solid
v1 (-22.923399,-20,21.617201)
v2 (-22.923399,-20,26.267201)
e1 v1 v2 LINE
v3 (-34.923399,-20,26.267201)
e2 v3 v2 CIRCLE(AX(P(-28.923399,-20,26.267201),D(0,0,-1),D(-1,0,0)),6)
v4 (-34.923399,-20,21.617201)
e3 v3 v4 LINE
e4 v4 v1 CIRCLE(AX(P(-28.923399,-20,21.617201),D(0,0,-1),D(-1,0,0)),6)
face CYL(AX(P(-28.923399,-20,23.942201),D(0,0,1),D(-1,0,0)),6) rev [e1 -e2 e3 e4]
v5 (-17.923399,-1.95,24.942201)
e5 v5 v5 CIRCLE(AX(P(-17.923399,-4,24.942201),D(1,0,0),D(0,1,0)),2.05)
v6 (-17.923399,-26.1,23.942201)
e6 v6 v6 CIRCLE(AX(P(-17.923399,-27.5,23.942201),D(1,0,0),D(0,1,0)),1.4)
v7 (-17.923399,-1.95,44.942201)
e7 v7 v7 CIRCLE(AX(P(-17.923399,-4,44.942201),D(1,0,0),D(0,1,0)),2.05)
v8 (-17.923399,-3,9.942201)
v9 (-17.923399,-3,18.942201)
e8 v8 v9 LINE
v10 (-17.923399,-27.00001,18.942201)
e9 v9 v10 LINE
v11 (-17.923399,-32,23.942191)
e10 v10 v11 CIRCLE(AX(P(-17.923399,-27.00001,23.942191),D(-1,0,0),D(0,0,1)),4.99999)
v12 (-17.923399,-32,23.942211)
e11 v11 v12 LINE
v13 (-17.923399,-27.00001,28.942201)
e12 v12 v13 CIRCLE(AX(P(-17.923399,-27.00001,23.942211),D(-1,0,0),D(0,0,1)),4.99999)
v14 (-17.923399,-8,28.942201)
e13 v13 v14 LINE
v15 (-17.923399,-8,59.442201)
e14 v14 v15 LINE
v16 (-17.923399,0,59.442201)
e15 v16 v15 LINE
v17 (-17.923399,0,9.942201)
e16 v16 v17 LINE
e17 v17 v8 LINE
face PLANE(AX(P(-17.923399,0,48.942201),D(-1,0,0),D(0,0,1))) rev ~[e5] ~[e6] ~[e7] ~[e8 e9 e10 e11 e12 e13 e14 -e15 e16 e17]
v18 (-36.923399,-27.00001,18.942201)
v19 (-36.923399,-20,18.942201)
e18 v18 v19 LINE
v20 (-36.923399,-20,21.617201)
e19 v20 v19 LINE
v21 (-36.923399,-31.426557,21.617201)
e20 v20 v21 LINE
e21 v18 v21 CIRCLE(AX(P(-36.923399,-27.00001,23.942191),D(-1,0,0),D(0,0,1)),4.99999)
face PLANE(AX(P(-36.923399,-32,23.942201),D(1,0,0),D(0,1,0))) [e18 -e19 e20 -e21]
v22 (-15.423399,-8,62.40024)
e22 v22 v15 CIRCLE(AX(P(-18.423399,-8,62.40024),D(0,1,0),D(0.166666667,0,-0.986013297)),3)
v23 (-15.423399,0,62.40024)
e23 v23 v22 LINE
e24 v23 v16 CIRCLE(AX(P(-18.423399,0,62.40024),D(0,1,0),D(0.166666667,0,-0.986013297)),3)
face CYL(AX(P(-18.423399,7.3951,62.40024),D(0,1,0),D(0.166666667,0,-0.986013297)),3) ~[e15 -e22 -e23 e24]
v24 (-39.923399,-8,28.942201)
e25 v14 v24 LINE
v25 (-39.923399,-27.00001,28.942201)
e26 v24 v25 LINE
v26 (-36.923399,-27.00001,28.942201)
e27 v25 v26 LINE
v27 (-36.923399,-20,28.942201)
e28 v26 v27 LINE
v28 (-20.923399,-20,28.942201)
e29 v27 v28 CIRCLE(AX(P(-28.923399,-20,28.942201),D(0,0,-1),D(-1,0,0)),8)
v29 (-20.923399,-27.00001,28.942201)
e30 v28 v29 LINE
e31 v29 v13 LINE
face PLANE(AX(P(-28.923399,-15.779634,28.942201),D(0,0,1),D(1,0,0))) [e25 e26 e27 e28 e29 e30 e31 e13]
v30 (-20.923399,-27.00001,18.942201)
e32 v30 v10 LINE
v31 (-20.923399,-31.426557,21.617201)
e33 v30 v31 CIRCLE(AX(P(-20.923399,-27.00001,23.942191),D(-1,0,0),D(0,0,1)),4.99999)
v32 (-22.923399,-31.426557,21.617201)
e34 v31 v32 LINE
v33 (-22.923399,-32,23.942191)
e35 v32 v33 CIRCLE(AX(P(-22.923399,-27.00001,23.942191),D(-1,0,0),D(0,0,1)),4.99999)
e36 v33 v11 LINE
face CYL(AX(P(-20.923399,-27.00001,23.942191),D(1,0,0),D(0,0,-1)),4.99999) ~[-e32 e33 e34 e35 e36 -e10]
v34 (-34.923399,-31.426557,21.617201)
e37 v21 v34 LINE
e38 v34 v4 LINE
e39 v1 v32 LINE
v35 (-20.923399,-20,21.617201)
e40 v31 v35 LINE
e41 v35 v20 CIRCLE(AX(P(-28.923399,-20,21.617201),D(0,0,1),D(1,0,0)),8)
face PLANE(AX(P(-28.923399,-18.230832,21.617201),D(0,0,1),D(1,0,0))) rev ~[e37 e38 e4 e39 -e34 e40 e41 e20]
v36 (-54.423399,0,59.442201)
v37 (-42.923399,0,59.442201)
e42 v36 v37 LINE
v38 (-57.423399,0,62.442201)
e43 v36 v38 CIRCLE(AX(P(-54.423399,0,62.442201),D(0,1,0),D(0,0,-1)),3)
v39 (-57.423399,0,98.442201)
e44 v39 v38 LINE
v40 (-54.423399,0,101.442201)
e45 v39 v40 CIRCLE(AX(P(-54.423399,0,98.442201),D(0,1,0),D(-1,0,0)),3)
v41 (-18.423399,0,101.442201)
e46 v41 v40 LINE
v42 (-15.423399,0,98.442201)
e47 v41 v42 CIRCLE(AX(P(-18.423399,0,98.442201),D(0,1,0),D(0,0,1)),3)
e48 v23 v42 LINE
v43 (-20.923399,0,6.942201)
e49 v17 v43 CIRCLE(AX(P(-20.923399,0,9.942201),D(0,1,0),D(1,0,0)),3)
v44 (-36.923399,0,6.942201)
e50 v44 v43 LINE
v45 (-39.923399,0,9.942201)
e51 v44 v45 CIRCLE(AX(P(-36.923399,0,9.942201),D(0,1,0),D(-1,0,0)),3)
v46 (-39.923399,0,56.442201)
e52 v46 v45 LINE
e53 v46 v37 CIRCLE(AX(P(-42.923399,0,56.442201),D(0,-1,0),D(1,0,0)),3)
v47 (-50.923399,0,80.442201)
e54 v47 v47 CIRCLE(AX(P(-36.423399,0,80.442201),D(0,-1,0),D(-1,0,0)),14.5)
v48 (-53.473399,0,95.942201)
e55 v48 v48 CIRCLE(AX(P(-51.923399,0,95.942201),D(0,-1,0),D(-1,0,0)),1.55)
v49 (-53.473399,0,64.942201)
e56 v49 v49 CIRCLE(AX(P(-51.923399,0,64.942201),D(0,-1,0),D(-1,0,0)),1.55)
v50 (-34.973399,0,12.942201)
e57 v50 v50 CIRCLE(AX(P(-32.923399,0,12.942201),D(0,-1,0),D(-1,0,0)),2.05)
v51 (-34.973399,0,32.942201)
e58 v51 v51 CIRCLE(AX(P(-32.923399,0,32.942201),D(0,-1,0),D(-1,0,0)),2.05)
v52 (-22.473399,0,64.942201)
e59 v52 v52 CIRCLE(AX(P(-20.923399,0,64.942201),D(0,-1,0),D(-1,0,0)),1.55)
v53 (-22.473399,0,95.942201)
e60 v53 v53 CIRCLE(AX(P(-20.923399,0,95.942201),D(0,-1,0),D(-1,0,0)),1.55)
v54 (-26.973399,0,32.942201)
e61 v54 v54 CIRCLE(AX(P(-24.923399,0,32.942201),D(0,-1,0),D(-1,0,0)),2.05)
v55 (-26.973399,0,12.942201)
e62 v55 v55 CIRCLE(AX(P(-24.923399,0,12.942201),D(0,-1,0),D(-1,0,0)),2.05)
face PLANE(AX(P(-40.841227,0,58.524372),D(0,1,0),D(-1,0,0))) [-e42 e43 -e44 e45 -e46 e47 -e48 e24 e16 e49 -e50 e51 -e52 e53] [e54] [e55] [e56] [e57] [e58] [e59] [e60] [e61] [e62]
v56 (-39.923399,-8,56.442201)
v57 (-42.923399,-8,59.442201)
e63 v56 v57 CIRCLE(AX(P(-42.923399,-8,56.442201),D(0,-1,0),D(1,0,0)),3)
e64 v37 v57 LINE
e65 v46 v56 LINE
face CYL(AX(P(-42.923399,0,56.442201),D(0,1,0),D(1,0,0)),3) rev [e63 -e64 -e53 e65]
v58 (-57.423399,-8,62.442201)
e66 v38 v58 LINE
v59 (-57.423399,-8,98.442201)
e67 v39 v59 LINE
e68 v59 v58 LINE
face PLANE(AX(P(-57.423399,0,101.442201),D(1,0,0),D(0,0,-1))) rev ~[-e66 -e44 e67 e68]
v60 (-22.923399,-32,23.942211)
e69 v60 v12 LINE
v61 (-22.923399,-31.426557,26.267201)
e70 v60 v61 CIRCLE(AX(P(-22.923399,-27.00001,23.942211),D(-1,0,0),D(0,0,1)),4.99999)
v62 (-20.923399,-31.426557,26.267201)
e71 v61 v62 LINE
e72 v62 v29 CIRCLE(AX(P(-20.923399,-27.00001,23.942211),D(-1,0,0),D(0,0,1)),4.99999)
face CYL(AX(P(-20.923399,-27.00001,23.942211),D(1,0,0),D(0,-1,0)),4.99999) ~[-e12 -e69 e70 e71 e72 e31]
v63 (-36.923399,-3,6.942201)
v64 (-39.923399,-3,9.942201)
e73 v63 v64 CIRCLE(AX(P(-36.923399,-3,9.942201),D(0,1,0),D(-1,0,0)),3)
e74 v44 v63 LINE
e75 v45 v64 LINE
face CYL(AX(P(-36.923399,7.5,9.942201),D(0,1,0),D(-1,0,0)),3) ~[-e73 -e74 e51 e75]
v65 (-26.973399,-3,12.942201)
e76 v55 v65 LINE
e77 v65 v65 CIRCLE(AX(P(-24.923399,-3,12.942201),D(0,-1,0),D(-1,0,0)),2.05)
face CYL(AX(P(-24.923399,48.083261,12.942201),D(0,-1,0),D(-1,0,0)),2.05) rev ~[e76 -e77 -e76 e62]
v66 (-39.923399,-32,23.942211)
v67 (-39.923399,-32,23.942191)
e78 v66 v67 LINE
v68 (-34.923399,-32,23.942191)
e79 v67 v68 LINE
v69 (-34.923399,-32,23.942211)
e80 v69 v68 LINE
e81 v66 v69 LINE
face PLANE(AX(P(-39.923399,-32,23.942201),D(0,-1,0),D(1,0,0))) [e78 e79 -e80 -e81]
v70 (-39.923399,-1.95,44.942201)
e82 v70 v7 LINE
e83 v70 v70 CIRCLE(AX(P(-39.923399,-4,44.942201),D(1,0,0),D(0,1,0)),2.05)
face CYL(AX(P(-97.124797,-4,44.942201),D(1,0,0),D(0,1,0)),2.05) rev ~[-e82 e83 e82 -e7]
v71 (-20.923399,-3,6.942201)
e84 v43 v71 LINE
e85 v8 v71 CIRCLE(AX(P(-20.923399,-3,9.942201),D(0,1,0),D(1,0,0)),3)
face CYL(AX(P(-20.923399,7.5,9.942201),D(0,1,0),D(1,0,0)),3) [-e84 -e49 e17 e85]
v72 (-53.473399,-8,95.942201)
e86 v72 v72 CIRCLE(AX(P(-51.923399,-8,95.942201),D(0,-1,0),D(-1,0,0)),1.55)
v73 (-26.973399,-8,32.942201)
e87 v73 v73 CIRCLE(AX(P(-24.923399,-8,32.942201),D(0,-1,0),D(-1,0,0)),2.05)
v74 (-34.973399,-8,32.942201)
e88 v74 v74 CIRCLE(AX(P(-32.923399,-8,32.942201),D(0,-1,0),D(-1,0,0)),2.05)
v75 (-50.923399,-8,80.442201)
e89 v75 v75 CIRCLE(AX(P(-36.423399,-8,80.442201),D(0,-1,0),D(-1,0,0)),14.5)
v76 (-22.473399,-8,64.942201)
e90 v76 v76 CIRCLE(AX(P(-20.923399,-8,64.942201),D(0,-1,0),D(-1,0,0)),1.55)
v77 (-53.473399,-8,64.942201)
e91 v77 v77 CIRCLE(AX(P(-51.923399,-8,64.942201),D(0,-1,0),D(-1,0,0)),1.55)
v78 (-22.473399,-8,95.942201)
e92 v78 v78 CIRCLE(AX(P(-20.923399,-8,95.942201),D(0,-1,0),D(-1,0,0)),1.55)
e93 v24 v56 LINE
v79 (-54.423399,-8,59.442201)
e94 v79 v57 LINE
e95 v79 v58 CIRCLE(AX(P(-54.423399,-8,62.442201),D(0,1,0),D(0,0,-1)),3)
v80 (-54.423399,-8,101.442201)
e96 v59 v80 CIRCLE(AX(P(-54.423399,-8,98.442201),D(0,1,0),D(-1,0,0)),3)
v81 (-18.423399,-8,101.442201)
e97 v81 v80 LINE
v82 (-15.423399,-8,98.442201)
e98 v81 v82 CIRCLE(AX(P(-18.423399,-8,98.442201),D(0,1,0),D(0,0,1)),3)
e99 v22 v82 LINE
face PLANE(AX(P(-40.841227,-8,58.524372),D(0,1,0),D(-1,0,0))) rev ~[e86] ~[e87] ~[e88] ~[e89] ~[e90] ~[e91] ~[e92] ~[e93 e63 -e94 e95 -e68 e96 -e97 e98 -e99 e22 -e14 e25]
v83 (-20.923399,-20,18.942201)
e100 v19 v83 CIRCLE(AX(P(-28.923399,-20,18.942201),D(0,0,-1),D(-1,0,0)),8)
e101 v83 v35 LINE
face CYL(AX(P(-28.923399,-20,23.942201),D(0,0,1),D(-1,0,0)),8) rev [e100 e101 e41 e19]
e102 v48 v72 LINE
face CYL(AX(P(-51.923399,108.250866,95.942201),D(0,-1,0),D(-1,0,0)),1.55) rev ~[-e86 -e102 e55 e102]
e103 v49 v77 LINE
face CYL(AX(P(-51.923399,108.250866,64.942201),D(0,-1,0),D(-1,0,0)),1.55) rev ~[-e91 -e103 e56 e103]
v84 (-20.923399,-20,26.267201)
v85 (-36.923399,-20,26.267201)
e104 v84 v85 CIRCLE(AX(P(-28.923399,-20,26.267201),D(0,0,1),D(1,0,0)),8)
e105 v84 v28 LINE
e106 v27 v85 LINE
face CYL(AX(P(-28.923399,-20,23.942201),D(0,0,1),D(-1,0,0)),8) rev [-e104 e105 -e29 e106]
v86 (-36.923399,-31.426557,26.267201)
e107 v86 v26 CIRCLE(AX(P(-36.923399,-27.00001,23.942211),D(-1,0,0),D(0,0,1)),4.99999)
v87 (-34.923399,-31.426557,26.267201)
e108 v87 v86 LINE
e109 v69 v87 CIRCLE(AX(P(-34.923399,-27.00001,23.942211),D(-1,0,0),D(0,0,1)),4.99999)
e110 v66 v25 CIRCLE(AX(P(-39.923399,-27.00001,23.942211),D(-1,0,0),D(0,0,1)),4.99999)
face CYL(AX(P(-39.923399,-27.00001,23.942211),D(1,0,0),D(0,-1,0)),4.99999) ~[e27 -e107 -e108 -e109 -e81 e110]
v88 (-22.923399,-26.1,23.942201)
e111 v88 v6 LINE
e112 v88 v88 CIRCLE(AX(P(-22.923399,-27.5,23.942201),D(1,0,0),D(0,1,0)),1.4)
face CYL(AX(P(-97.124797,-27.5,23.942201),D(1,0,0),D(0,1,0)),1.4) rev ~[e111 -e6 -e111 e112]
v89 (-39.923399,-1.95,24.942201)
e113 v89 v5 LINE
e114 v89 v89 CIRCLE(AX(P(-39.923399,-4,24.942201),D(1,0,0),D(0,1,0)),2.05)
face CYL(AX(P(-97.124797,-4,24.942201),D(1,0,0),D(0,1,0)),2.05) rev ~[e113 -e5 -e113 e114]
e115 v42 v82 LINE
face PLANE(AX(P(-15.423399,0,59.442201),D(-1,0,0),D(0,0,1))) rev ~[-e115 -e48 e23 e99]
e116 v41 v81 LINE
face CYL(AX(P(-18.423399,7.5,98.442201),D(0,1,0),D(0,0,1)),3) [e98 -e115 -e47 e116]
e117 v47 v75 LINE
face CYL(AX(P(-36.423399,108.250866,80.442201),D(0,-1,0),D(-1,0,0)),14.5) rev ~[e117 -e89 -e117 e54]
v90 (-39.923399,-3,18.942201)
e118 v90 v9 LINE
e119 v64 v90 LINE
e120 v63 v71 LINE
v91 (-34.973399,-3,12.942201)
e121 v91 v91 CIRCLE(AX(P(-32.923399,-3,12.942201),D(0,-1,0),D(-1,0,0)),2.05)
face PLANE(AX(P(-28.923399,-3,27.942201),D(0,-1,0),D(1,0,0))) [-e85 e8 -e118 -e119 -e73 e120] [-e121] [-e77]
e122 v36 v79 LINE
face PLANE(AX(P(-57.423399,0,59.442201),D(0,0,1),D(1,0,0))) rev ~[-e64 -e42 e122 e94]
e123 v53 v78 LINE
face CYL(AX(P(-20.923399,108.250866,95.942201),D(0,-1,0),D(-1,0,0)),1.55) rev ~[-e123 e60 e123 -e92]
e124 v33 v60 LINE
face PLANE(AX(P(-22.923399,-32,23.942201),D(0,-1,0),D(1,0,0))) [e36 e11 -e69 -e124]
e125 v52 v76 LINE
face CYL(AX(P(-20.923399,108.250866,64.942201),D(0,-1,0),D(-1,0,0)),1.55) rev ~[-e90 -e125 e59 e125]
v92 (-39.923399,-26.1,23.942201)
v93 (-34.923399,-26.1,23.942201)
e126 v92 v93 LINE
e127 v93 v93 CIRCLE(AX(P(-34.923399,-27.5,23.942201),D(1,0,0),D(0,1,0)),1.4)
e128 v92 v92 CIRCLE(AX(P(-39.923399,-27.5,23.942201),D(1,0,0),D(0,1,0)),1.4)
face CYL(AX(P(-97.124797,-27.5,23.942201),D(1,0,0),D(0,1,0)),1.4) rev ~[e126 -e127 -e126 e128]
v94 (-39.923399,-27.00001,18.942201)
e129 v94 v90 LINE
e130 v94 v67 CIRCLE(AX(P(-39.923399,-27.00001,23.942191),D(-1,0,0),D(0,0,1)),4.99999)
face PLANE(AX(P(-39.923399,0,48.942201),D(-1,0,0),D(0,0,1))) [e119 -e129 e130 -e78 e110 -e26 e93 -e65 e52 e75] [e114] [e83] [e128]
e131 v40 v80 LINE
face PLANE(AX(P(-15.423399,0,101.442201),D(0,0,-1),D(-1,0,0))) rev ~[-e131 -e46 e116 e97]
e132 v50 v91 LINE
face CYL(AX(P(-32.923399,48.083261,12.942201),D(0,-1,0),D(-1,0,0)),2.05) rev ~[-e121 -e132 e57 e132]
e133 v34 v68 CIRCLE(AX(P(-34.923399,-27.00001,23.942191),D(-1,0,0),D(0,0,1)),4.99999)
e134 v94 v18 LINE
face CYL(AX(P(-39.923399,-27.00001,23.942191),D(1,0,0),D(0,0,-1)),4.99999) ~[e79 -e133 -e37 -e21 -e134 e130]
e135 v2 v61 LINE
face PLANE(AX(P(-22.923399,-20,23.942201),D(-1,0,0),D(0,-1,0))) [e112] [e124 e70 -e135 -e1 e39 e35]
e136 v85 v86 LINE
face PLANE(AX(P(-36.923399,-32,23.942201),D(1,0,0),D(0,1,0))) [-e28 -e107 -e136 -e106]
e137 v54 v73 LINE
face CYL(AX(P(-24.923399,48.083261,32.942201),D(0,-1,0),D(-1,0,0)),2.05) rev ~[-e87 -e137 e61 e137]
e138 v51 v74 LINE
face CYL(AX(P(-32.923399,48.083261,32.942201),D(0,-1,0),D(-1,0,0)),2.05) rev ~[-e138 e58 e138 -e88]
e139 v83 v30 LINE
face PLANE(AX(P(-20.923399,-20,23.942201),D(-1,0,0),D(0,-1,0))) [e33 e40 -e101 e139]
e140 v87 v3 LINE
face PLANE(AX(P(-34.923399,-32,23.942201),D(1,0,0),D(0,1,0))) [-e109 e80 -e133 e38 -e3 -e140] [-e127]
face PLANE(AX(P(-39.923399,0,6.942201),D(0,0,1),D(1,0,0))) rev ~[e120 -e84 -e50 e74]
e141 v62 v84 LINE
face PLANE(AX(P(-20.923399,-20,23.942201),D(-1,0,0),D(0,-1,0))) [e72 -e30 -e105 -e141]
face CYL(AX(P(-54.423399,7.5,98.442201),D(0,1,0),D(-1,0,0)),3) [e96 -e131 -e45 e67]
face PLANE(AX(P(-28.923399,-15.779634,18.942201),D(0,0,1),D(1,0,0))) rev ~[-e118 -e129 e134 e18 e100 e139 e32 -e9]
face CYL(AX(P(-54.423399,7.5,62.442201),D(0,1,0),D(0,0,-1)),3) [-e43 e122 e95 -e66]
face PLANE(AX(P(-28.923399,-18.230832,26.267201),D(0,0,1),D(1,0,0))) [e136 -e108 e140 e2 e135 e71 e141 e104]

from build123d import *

# Parameters (mm, degrees)
F0_W          = 22
F0_H          = 42
F1_DEPTH      = 3
F2_W          = 3
F2_H          = 30
F2_W_2        = 5
F3_DEPTH      = 22
F4_D          = 4.1
F7_DEPTH      = 5
F8_DEPTH      = 2.325
F9_R          = 4.99999
F11_D         = 4.1
F12_D         = 2.8
F13_W         = 22
F13_H         = 10.5
F14_DEPTH     = 8
F15_T1_DEPTH  = 8
F15_T3_DEPTH  = 18
F15_T5_DEPTH  = 18
F15_T7_DEPTH  = 22.7901994578
F15_T9_DEPTH  = 23
F15_T11_DEPTH = 23
F15_T13_DEPTH = 23
F16_D         = 29
F17_D         = 3.1


# Not quite as in the source:
# - a fillet or chamfer that OpenCascade refuses, or shapes differently, is made with other operations: its cross-section is extruded or revolved along the edge and cut away or added
# - a fillet or chamfer is up to 0.001 mm smaller than in the source, because OpenCascade refuses the exact size


with BuildPart() as f1:
    # F0 (on Front) → F1 (new body)
    with BuildSketch(Plane.XZ):
        with Locations((-28.9233987555, 27.9422005266)):
            Rectangle(F0_W, F0_H)
    extrude(amount=F1_DEPTH)

    # F2 (on face) → F3 (join)
    with BuildSketch(Plane(origin=(-39.9233987555, 0, 0), x_dir=(0, -1, 0), z_dir=(-1, 0, 0))):
        with Locations((1.5, 33.9422005266)):
            Rectangle(F2_W, F2_H)
        with Locations((5.5, 33.9422005266)):
            Rectangle(F2_W_2, F2_H)
    extrude(amount=-F3_DEPTH)

    # F4 (through all)
    with Locations(Plane(origin=(0, 0, 0), x_dir=(1, 0, 0), z_dir=(0, 1, 0))):
        with Locations((-24.9233987555, -12.9422005266), (-32.9233987555, -12.9422005266), (-32.9233987555, -32.9422005266), (-24.9233987555, -32.9422005266)):
            Hole(F4_D / 2)

    # F6 (on line) → F7 (join, symmetric)
    with BuildSketch(Plane.XY.offset(23.9422005266)):
        with BuildLine():
            ThreePointArc((-36.9233987555, -20), (-28.9233987555, -12), (-20.9233987555, -20))
            Line((-20.9233987555, -20), (-20.9233987555, -32))
            Line((-20.9233987555, -32), (-17.9233987555, -32))
            Line((-17.9233987555, -32), (-17.9233987555, 0))
            Line((-17.9233987555, 0), (-39.9233987555, 0))
            Line((-39.9233987555, 0), (-39.9233987555, -32))
            Line((-39.9233987555, -32), (-36.9233987555, -32))
            Line((-36.9233987555, -32), (-36.9233987555, -20))
        make_face()
    extrude(amount=F7_DEPTH, both=True)

    # F6 (on line) → F8 (join, symmetric)
    with BuildSketch(Plane.XY.offset(23.9422005266)):
        with BuildLine():
            ThreePointArc((-34.9233987555, -20), (-28.9233987555, -14), (-22.9233987555, -20))
            Line((-22.9233987555, -20), (-22.9233987555, -25.2915026221))
            ThreePointArc((-22.9233987555, -25.2915026221), (-21.4400839819, -22.8284271247), (-20.9233987555, -20))
            ThreePointArc((-20.9233987555, -20), (-28.9233987555, -12), (-36.9233987555, -20))
            ThreePointArc((-36.9233987555, -20), (-36.406713529, -22.8284271247), (-34.9233987555, -25.2915026221))
            Line((-34.9233987555, -25.2915026221), (-34.9233987555, -20))
        make_face()
        with BuildLine():
            Line((-34.9233987555, -32), (-34.9233987555, -25.2915026221))
            ThreePointArc((-34.9233987555, -25.2915026221), (-36.406713529, -22.8284271247), (-36.9233987555, -20))
            Line((-36.9233987555, -20), (-36.9233987555, -32))
            Line((-36.9233987555, -32), (-34.9233987555, -32))
        make_face()
        with BuildLine():
            ThreePointArc((-20.9233987555, -20), (-21.4400839819, -22.8284271247), (-22.9233987555, -25.2915026221))
            Line((-22.9233987555, -25.2915026221), (-22.9233987555, -32))
            Line((-22.9233987555, -32), (-20.9233987555, -32))
            Line((-20.9233987555, -32), (-20.9233987555, -20))
        make_face()
    extrude(amount=F8_DEPTH, both=True)

    # F9 (radius 5 in the source; OpenCascade refuses exactly that, so slightly less here)
    f9_edges = [f1.edges().sort_by_distance(p)[0] for p in [
        (-38.423399, -32, 28.942201),
        (-38.423399, -32, 18.942201),
        (-19.423399, -32, 18.942201),
        (-19.423399, -32, 28.942201),
    ]]
    fillet(f9_edges, radius=F9_R)

    # F11 (through all)
    with Locations(Plane(origin=(-39.9233987555, 0, 0), x_dir=(0, -1, 0), z_dir=(-1, 0, 0))):
        with Locations((4, 44.9422005266), (4, 24.9422005266)):
            Hole(F11_D / 2)

    # F12 (through all)
    with Locations(Plane(origin=(-39.9233987555, 0, 0), x_dir=(0, -1, 0), z_dir=(-1, 0, 0))):
        with Locations((27.5, 23.9422005266)):
            Hole(F12_D / 2)

    # F13 (on Front) → F14 (join)
    with BuildSketch(Plane.XZ):
        Polygon((-57.4233987555, 59.4422005266), (-39.9233987555, 59.4422005266), (-17.9233987555, 59.4422005266), (-15.4233987555, 59.4422005266), (-15.4233987555, 101.4422005266), (-57.4233987555, 101.4422005266), align=None)
        with Locations((-28.9233987555, 54.1922005266)):
            Rectangle(F13_W, F13_H)
    extrude(amount=F14_DEPTH)

    # F15: fillet of radius 3 on 7 edges, made by hand

    # F15_s2 → F15_t1 (join)
    with BuildSketch(Plane.XZ):
        with BuildLine():
            ThreePointArc((-39.9233987555, 56.4422005266), (-40.8020784119, 58.5635208702), (-42.9233987555, 59.4422005266))
            Line((-42.9233987555, 59.4422005266), (-39.9233987555, 59.4422005266))
            Line((-39.9233987555, 59.4422005266), (-39.9233987555, 56.4422005266))
        make_face()
    extrude(amount=F15_T1_DEPTH)

    # F15_s4 → F15_t3 (cut)
    with BuildSketch(Plane.XZ.offset(-7.5)):
        with BuildLine():
            ThreePointArc((-39.9233987555, 9.9422005266), (-39.0447190991, 7.820880183), (-36.9233987555, 6.9422005266))
            Line((-36.9233987555, 6.9422005266), (-39.9233987555, 6.9422005266))
            Line((-39.9233987555, 6.9422005266), (-39.9233987555, 9.9422005266))
        make_face()
    extrude(amount=F15_T3_DEPTH, mode=Mode.SUBTRACT)

    # F15_s6 → F15_t5 (cut)
    with BuildSketch(Plane.XZ.offset(-7.5)):
        with BuildLine():
            ThreePointArc((-17.9233987555, 9.9422005266), (-18.8020784119, 7.820880183), (-20.9233987555, 6.9422005266))
            Line((-20.9233987555, 6.9422005266), (-17.9233987555, 6.9422005266))
            Line((-17.9233987555, 6.9422005266), (-17.9233987555, 9.9422005266))
        make_face()
    extrude(amount=F15_T5_DEPTH, mode=Mode.SUBTRACT)

    # F15_s8 → F15_t7 (cut)
    with BuildSketch(Plane.XZ.offset(-7.3950997289)):
        with BuildLine():
            ThreePointArc((-17.9233987555, 59.4422005266), (-16.132110908, 60.463748745), (-15.4233987555, 62.4002404181))
            Line((-15.4233987555, 62.4002404181), (-15.4233987555, 59.4422005266))
            Line((-15.4233987555, 59.4422005266), (-17.9233987555, 59.4422005266))
        make_face()
    extrude(amount=F15_T7_DEPTH, mode=Mode.SUBTRACT)

    # F15_s10 → F15_t9 (cut)
    with BuildSketch(Plane.XZ.offset(-7.5)):
        with BuildLine():
            ThreePointArc((-18.4233987555, 101.4422005266), (-16.3020784119, 100.5635208702), (-15.4233987555, 98.4422005266))
            Line((-15.4233987555, 98.4422005266), (-15.4233987555, 101.4422005266))
            Line((-15.4233987555, 101.4422005266), (-18.4233987555, 101.4422005266))
        make_face()
    extrude(amount=F15_T9_DEPTH, mode=Mode.SUBTRACT)

    # F15_s12 → F15_t11 (cut)
    with BuildSketch(Plane.XZ.offset(-7.5)):
        with BuildLine():
            ThreePointArc((-57.4233987555, 98.4422005266), (-56.5447190991, 100.5635208702), (-54.4233987555, 101.4422005266))
            Line((-54.4233987555, 101.4422005266), (-57.4233987555, 101.4422005266))
            Line((-57.4233987555, 101.4422005266), (-57.4233987555, 98.4422005266))
        make_face()
    extrude(amount=F15_T11_DEPTH, mode=Mode.SUBTRACT)

    # F15_s14 → F15_t13 (cut)
    with BuildSketch(Plane.XZ.offset(-7.5)):
        with BuildLine():
            ThreePointArc((-54.4233987555, 59.4422005266), (-56.5447190991, 60.320880183), (-57.4233987555, 62.4422005266))
            Line((-57.4233987555, 62.4422005266), (-57.4233987555, 59.4422005266))
            Line((-57.4233987555, 59.4422005266), (-54.4233987555, 59.4422005266))
        make_face()
    extrude(amount=F15_T13_DEPTH, mode=Mode.SUBTRACT)

    # F16 (through all)
    with Locations(Plane(origin=(0, 0, 0), x_dir=(1, 0, 0), z_dir=(0, 1, 0))):
        with Locations((-36.4233987555, -80.4422005266)):
            Hole(F16_D / 2)

    # F17 (through all)
    with Locations(Plane(origin=(0, 0, 0), x_dir=(1, 0, 0), z_dir=(0, 1, 0))):
        with Locations((-51.9233987555, -95.9422005266), (-20.9233987555, -95.9422005266), (-20.9233987555, -64.9422005266), (-51.9233987555, -64.9422005266)):
            Hole(F17_D / 2)


solid = f1.part
